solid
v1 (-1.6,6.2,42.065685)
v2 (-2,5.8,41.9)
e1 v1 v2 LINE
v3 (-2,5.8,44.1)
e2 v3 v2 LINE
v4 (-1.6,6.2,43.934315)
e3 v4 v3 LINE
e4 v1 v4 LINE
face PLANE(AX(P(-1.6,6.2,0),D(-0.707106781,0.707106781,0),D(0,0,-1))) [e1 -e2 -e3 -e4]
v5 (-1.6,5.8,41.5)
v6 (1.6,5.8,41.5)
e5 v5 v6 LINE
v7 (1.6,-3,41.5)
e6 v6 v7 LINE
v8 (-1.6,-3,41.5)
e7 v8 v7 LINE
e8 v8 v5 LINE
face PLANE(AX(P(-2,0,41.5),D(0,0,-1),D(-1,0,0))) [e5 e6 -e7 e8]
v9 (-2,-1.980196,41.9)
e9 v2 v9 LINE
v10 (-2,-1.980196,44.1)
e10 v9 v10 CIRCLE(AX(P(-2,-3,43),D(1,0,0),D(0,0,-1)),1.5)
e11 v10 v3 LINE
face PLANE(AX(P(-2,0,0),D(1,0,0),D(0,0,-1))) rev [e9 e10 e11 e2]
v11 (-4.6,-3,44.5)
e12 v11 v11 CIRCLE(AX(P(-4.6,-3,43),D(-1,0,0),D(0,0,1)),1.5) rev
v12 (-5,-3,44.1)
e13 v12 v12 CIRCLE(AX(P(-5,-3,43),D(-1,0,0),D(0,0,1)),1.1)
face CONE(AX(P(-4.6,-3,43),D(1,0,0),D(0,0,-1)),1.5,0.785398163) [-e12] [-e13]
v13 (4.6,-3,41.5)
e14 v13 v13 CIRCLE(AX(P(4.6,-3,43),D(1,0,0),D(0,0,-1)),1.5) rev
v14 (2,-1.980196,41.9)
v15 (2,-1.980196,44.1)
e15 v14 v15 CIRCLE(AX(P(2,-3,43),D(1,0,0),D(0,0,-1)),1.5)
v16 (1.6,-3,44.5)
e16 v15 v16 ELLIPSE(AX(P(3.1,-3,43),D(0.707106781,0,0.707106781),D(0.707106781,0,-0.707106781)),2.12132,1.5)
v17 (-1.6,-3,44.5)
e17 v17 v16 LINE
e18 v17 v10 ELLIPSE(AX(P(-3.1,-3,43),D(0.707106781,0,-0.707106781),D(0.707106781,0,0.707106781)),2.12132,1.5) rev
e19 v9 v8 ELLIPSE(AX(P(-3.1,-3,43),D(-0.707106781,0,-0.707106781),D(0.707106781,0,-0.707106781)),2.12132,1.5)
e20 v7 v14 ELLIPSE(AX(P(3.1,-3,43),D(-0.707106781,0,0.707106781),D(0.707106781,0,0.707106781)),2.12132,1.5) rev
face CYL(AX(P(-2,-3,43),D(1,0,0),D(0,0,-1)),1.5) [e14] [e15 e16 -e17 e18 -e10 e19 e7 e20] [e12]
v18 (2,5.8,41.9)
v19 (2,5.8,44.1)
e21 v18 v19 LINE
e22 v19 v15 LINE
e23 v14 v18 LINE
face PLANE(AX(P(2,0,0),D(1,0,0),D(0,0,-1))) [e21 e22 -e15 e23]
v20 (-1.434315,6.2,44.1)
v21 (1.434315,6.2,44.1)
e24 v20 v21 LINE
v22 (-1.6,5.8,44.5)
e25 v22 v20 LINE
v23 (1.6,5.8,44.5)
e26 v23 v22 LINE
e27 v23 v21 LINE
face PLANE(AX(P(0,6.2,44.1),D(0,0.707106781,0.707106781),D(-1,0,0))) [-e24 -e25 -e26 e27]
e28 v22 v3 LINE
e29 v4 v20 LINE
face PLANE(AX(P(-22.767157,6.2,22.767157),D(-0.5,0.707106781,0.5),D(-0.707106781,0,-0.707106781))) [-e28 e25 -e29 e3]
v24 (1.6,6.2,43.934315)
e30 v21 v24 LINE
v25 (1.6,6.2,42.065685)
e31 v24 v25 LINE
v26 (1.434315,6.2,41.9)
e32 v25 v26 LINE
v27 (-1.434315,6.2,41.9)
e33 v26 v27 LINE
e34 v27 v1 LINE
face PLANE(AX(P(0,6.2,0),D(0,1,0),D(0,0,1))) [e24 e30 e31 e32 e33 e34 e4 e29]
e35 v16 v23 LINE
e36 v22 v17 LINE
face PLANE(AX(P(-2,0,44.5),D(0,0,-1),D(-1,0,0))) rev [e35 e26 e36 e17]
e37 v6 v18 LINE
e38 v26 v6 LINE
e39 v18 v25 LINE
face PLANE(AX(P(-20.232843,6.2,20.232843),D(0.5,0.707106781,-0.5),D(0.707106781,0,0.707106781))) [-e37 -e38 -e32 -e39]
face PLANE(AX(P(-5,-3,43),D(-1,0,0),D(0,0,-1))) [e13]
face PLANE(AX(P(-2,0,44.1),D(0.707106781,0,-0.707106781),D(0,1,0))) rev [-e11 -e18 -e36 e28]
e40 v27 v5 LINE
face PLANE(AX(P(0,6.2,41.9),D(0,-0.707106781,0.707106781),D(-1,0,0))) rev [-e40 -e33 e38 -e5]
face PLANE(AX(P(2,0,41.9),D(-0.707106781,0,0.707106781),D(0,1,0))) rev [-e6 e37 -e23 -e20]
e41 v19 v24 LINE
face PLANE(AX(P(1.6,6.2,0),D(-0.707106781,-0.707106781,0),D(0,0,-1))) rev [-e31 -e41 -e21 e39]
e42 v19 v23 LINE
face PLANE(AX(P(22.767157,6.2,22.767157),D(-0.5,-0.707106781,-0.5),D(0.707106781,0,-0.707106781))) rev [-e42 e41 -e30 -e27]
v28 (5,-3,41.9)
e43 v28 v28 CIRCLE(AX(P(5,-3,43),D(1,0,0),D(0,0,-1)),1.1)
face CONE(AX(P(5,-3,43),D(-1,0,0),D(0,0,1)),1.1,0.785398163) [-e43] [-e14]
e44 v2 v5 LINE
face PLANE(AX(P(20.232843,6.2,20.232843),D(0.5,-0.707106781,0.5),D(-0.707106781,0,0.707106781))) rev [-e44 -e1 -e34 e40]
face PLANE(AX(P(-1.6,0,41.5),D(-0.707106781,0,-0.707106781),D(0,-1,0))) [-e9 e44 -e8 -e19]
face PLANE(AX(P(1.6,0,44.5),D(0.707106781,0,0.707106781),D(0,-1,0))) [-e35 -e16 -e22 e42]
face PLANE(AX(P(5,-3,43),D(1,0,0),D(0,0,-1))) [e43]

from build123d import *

# Parameters (mm, degrees)
SKETCH_1_R               = 49.99999999999999
EXTRUDE_1_DEPTH          = 50
CUT_EXTRUDE_2_DEPTH      = 87.60254037844385
CUT_EXTRUDE_3_DEPTH      = 76.00000000000004
FILLET_1_R               = 2
CHAMFER_1_SIZE           = 0.6
SHELL_1_T                = -1.2
EXTRUDE_2_DEPTH          = 2
EXTRUDE_2_DEPTH_BACK     = 2
SKETCH_4_R               = 1.500000000000004
SKETCH_5_R               = 1.500000000000004
EXTRUDE_3_DEPTH          = 3
CUT_EXTRUDE_4_DEPTH      = 75.75240590513992
CUT_EXTRUDE_4_DEPTH_BACK = 75.75240590513992
SKETCH_7_W               = 4
SKETCH_7_H               = 3.000000000000007
EXTRUDE_4_DEPTH          = 3
SKETCH_8_W               = 61.68253403520822
SKETCH_8_H               = 49.35584928772633
CUT_EXTRUDE_5_DEPTH      = 75.75240590513992
SKETCH_9_W               = 4
SKETCH_9_H               = 3.000000000000007
EXTRUDE_5_DEPTH          = 6.2
CHAMFER_2_SIZE           = 0.4
CHAMFER_3_SIZE           = 0.4
CHAMFER_4_SIZE           = 0.4


with BuildPart() as part:
    # 草图1 → 凸台-拉伸1 (new body)
    with BuildSketch(Plane(origin=(0, 0, 0), x_dir=(1, 0, 0), z_dir=(0, 1, 0))):
        with Locations(Location((0, 0, 0), (0, 0, 270))):
            Circle(SKETCH_1_R)
    extrude(amount=EXTRUDE_1_DEPTH)

    # 草图2 → 切除-拉伸2 (cut, through all)
    with BuildSketch(Plane(origin=(0, 50, 0), x_dir=(1, 0, 0), z_dir=(0, 1, 0))):
        with BuildLine():
            Line((-24.999999999999993, -43.301270189221945), (-7.11e-15, -1.421e-14))
            Line((7.11e-15, -1.421e-14), (25.00000000000002, -43.301270189221924))
            ThreePointArc((25.00000000000002, -43.301270189221924), (2.487e-14, 50), (-25.000000000000053, -43.30127018922191))
        make_face()
    extrude(amount=-CUT_EXTRUDE_2_DEPTH, mode=Mode.SUBTRACT)

    # 草图3 → 切除-拉伸3 (cut, through all)
    with BuildSketch(Plane(origin=(0, 50, 0), x_dir=(1, 0, 0), z_dir=(0, 1, 0))):
        with BuildLine():
            ThreePointArc((-7.5000000000002185, -12.990381056766447), (-3.882285676537599, -14.488887394336077), (6.9403e-13, -14.999999999999996))
            ThreePointArc((6.9403e-13, -14.999999999999996), (3.8822856765382965, -14.488887394335892), (7.500000000000258, -12.990381056766429))
            Line((7.5, -12.990381056766573), (0, 0))
            Line((4.01e-15, 0), (-7.499999999999988, -12.990381056766578))
        make_face()
        with BuildLine():
            ThreePointArc((15, 0), (-7.499999999999881, 12.99038105676664), (-7.5000000000002185, -12.990381056766447))
            Line((-7.499999999999988, -12.990381056766578), (4.01e-15, 0))
            Line((0, 0), (7.5, -12.990381056766573))
            ThreePointArc((7.500000000000258, -12.990381056766429), (12.99038105676665, -7.499999999999878), (15, -3.67e-15))
        make_face()
        with BuildLine():
            ThreePointArc((7.500000000000258, -12.990381056766429), (3.8822856765382965, -14.488887394335892), (6.9403e-13, -14.999999999999996))
            Line((6.9456e-13, -15), (8.660254037844409, -15))
            Line((8.660254037844393, -15.000000000000004), (7.5, -12.990381056766573))
        make_face()
        with BuildLine():
            Line((-7.499999999999988, -12.990381056766578), (-8.660254037844377, -15.000000000000002))
            Line((-8.660254037844384, -15), (6.9456e-13, -15))
            ThreePointArc((6.9403e-13, -14.999999999999996), (-3.882285676537599, -14.488887394336077), (-7.5000000000002185, -12.990381056766447))
        make_face()
    extrude(amount=-CUT_EXTRUDE_3_DEPTH, mode=Mode.SUBTRACT)

    # 圆角1
    fillet_1_edges = [part.edges().sort_by_distance(p)[0] for p in [
        (25.00000000000002, 25, 43.301270189221924),
        (-25.00000000000002, 25, 43.301270189221924),
        (-8.66025403784438, 25, 15),
        (8.6602540378444, 25, 15.000000000000002),
    ]]
    fillet(fillet_1_edges, radius=FILLET_1_R)

    # 倒角1
    chamfer_1_edges = [part.edges().sort_by_distance(p)[0] for p in [
        (8.79e-15, 0, 15),
        (-16.608380961798794, -7.11e-15, 28.766559657295183),
        (16.60838096179882, 0, 28.766559657295183),
        (2.132e-14, 0, 50),
        (8.505553499465146, 0, 15.267949192431121),
        (24.16775252630995, 0, 43.09090065934718),
        (-24.16775252630992, 0, 43.09090065934719),
        (-8.505553499465128, 0, 15.267949192431121),
    ]]
    chamfer(chamfer_1_edges, length=CHAMFER_1_SIZE)

    # 抽壳1
    shell_1_openings = [part.faces().sort_by_distance(p)[0] for p in [
        (0, 50, 34.229276229),
    ]]
    offset(amount=SHELL_1_T, openings=shell_1_openings)

    # 草图4 → 凸台-拉伸2 (add, two sides: drawn at the far end of the back side and taken through both)
    with BuildSketch(Plane(origin=(0, 0, 0), x_dir=(0, 0, -1), z_dir=(1, 0, 0)).offset(-EXTRUDE_2_DEPTH_BACK)):
        with BuildLine():
            Line((-44.5, 0), (-44.5, -3))
            ThreePointArc((-44.50000000000001, -3), (-43, -1.499999999999996), (-41.49999999999999, -3))
            Line((-41.49999999999999, -3), (-41.49999999999999, 0))
            Line((-41.49999999999999, 0), (-44.5, 0))
        make_face()
        with Locations((-43, -3)):
            Circle(SKETCH_4_R)
    extrude(amount=EXTRUDE_2_DEPTH + EXTRUDE_2_DEPTH_BACK)

    # 草图5 → 凸台-拉伸3 (add)
    with BuildSketch(Plane(origin=(2, 0, 0), x_dir=(0, 0, -1), z_dir=(1, 0, 0))):
        with Locations((-43, -3)):
            Circle(SKETCH_5_R)
    extrude_3 = extrude(amount=EXTRUDE_3_DEPTH)

    # 镜向1: 凸台-拉伸3 across plane
    add(extrude_3.mirror(Plane(origin=(0, 0, 0), x_dir=(0, 0, 1), z_dir=(1, 0, 0))))

    # 草图6 → 切除-拉伸4 (cut, two sides: drawn at the far end of the back side and taken through both)
    with BuildSketch(Plane(origin=(0, 0, 0), x_dir=(0, 0, -1), z_dir=(1, 0, 0)).offset(-CUT_EXTRUDE_4_DEPTH_BACK)):
        with BuildLine():
            ThreePointArc((-41.533119314589705, 49.97969668707788), (-27.73588672288851, 47.754377602956666), (-15.000000000000043, 42.000000000000036))
            Line((-15, 42.00000000000006), (-15, 50))
            Line((-15, 50), (-16, 50))
            Line((-16, 50), (-41.53311931459036, 50))
            Line((-41.53311931459036, 50), (-41.53311931459036, 49.97969668707786))
        make_face()
    extrude(amount=CUT_EXTRUDE_4_DEPTH + CUT_EXTRUDE_4_DEPTH_BACK, mode=Mode.SUBTRACT)

    # 草图7 → 凸台-拉伸4 (add)
    with BuildSketch(Plane(origin=(0, 1.2, 0), x_dir=(1, 0, 0), z_dir=(0, 1, 0))):
        Polygon((-3.1999999999999997, -40.3), (3.1999999999999997, -40.3), (3.2000000000000006, -45.699999999999996), (-3.199999999999999, -45.699999999999996), align=None)
        with Locations((0, -43)):
            Rectangle(SKETCH_7_W, SKETCH_7_H, mode=Mode.SUBTRACT)
    extrude(amount=EXTRUDE_4_DEPTH)

    # 草图8 → 切除-拉伸5 (cut, through all)
    with BuildSketch(Plane.XZ):
        with Locations((0.9928928322647028, 29.450924327847446)):
            Rectangle(SKETCH_8_W, SKETCH_8_H)
    extrude(amount=-CUT_EXTRUDE_5_DEPTH, mode=Mode.SUBTRACT)

    # 草图9 → 凸台-拉伸5 (add)
    with BuildSketch(Plane(origin=(0, 0, 0), x_dir=(1, 0, 0), z_dir=(0, 1, 0))):
        with Locations((0, -43)):
            Rectangle(SKETCH_9_W, SKETCH_9_H)
    extrude(amount=EXTRUDE_5_DEPTH)

    # 倒角2
    # the kernel refuses this chamfer: 0.4 mm, written as the material it takes off along each edge
    with BuildSketch(Plane(origin=(2, 0, 44.5), x_dir=(-0.999621916911297, 0, 0.027495876610578732), z_dir=(0, 1, 0))) as chamfer_2_piece_1:
        Polygon((CHAMFER_2_SIZE * 0.999621916911, -CHAMFER_2_SIZE * 0.0274958766106), (-CHAMFER_2_SIZE * 0.0274958766106, -CHAMFER_2_SIZE * 0.999621916911), (0, 0), align=None)
    extrude(amount=7.228673195186364, mode=Mode.SUBTRACT)
    with BuildSketch(Plane(origin=(-2, 0, 41.49999999999999), x_dir=(-0.027495876610586577, 0, 0.9996219169112966), z_dir=(0, 1, 0))) as chamfer_2_piece_2:
        Polygon((CHAMFER_2_SIZE * 0.999621916911, CHAMFER_2_SIZE * 0.0274958766106), (-CHAMFER_2_SIZE * 0.0274958766106, CHAMFER_2_SIZE * 0.999621916911), (0, 0), align=None)
    extrude(amount=7.228673195186364, mode=Mode.SUBTRACT)
    with BuildSketch(Plane(origin=(-2, 0, 44.5), x_dir=(-0.027495876610586577, 0, -0.9996219169112966), z_dir=(0, 1, 0))) as chamfer_2_piece_3:
        Polygon((CHAMFER_2_SIZE * 0.999621916911, -CHAMFER_2_SIZE * 0.0274958766106), (-CHAMFER_2_SIZE * 0.0274958766106, -CHAMFER_2_SIZE * 0.999621916911), (0, 0), align=None)
    extrude(amount=7.228673195186364, mode=Mode.SUBTRACT)
    with BuildSketch(Plane(origin=(2, 0, 41.49999999999999), x_dir=(-0.999621916911297, 0, -0.027495876610578732), z_dir=(0, 1, 0))) as chamfer_2_piece_4:
        Polygon((CHAMFER_2_SIZE * 0.999621916911, CHAMFER_2_SIZE * 0.0274958766106), (-CHAMFER_2_SIZE * 0.0274958766106, CHAMFER_2_SIZE * 0.999621916911), (0, 0), align=None)
    extrude(amount=7.228673195186364, mode=Mode.SUBTRACT)
    with BuildSketch(Plane(origin=(2, -4.0286731951863635, 41.49999999999999), x_dir=(-0.999621916911297, 0, -0.027495876610578732), z_dir=(0, 1, 0))) as chamfer_2_piece_5_section:
        Polygon((CHAMFER_2_SIZE * 0.999621916911, CHAMFER_2_SIZE * 0.0274958766106), (-CHAMFER_2_SIZE * 0.0274958766106, CHAMFER_2_SIZE * 0.999621916911), (0, 0), align=None)
    chamfer_2_piece_5 = extrude(amount=4.0286731951863635, mode=Mode.PRIVATE)
    chamfer_2_piece_5 = chamfer_2_piece_5 - Plane(origin=(1.8624054064801094, -3, 43), x_dir=(0, 0, -1), z_dir=(-1, 0, 0)) * Cylinder(1.500000000000004, 10, mode=Mode.PRIVATE)
    add(chamfer_2_piece_5, mode=Mode.SUBTRACT)
    with BuildSketch(Plane(origin=(-2, 0, 44.5), x_dir=(-0.027495876610586577, 0, -0.9996219169112966), z_dir=(0, -1, 0))) as chamfer_2_piece_6_section:
        Polygon((CHAMFER_2_SIZE * 0.999621916911, CHAMFER_2_SIZE * 0.0274958766106), (-CHAMFER_2_SIZE * 0.0274958766106, CHAMFER_2_SIZE * 0.999621916911), (0, 0), align=None)
    chamfer_2_piece_6 = extrude(amount=4.028673195186364, mode=Mode.PRIVATE)
    chamfer_2_piece_6 = chamfer_2_piece_6 - Plane(origin=(-1.8624054062772368, -3, 43), x_dir=(0, 0, -1), z_dir=(1, 0, 0)) * Cylinder(1.500000000000004, 10, mode=Mode.PRIVATE)
    add(chamfer_2_piece_6, mode=Mode.SUBTRACT)
    with BuildSketch(Plane(origin=(-2, -4.0286731951863635, 41.49999999999999), x_dir=(-0.027495876610586577, 0, 0.9996219169112966), z_dir=(0, 1, 0))) as chamfer_2_piece_7_section:
        Polygon((CHAMFER_2_SIZE * 0.999621916911, CHAMFER_2_SIZE * 0.0274958766106), (-CHAMFER_2_SIZE * 0.0274958766106, CHAMFER_2_SIZE * 0.999621916911), (0, 0), align=None)
    chamfer_2_piece_7 = extrude(amount=4.0286731951863635, mode=Mode.PRIVATE)
    chamfer_2_piece_7 = chamfer_2_piece_7 - Plane(origin=(-1.8624054064801103, -3, 43), x_dir=(0, 0, -1), z_dir=(1, 0, 0)) * Cylinder(1.500000000000004, 10, mode=Mode.PRIVATE)
    add(chamfer_2_piece_7, mode=Mode.SUBTRACT)
    with BuildSketch(Plane(origin=(2, 0, 44.5), x_dir=(-0.999621916911297, 0, 0.027495876610578732), z_dir=(0, -1, 0))) as chamfer_2_piece_8_section:
        Polygon((CHAMFER_2_SIZE * 0.999621916911, CHAMFER_2_SIZE * 0.0274958766106), (-CHAMFER_2_SIZE * 0.0274958766106, CHAMFER_2_SIZE * 0.999621916911), (0, 0), align=None)
    chamfer_2_piece_8 = extrude(amount=4.028673195186364, mode=Mode.PRIVATE)
    chamfer_2_piece_8 = chamfer_2_piece_8 - Plane(origin=(1.8624054062774078, -3, 43), x_dir=(0, 0, -1), z_dir=(-1, 0, 0)) * Cylinder(1.500000000000004, 10, mode=Mode.PRIVATE)
    add(chamfer_2_piece_8, mode=Mode.SUBTRACT)

    # 倒角3
    chamfer_3_edges = [part.edges().sort_by_distance(p)[0] for p in [
        (0, 6.2, 44.5),
        (-2, 6.2, 43),
        (2, 6.2, 43),
        (0, 6.2, 41.49999999999999),
        (1.8000000000000584, 6.2, 41.69999999999994),
        (-1.8000000000000587, 6.2, 41.699999999999946),
        (-1.8000000000000587, 6.2, 44.300000000000054),
        (1.800000000000062, 6.2, 44.30000000000006),
    ]]
    chamfer(chamfer_3_edges, length=CHAMFER_3_SIZE)

    # 倒角4
    chamfer_4_edges = [part.edges().sort_by_distance(p)[0] for p in [
        (5, -3, 44.50000000000001),
        (-5, -3, 44.50000000000001),
    ]]
    chamfer(chamfer_4_edges, length=CHAMFER_4_SIZE)


solid = part.part
